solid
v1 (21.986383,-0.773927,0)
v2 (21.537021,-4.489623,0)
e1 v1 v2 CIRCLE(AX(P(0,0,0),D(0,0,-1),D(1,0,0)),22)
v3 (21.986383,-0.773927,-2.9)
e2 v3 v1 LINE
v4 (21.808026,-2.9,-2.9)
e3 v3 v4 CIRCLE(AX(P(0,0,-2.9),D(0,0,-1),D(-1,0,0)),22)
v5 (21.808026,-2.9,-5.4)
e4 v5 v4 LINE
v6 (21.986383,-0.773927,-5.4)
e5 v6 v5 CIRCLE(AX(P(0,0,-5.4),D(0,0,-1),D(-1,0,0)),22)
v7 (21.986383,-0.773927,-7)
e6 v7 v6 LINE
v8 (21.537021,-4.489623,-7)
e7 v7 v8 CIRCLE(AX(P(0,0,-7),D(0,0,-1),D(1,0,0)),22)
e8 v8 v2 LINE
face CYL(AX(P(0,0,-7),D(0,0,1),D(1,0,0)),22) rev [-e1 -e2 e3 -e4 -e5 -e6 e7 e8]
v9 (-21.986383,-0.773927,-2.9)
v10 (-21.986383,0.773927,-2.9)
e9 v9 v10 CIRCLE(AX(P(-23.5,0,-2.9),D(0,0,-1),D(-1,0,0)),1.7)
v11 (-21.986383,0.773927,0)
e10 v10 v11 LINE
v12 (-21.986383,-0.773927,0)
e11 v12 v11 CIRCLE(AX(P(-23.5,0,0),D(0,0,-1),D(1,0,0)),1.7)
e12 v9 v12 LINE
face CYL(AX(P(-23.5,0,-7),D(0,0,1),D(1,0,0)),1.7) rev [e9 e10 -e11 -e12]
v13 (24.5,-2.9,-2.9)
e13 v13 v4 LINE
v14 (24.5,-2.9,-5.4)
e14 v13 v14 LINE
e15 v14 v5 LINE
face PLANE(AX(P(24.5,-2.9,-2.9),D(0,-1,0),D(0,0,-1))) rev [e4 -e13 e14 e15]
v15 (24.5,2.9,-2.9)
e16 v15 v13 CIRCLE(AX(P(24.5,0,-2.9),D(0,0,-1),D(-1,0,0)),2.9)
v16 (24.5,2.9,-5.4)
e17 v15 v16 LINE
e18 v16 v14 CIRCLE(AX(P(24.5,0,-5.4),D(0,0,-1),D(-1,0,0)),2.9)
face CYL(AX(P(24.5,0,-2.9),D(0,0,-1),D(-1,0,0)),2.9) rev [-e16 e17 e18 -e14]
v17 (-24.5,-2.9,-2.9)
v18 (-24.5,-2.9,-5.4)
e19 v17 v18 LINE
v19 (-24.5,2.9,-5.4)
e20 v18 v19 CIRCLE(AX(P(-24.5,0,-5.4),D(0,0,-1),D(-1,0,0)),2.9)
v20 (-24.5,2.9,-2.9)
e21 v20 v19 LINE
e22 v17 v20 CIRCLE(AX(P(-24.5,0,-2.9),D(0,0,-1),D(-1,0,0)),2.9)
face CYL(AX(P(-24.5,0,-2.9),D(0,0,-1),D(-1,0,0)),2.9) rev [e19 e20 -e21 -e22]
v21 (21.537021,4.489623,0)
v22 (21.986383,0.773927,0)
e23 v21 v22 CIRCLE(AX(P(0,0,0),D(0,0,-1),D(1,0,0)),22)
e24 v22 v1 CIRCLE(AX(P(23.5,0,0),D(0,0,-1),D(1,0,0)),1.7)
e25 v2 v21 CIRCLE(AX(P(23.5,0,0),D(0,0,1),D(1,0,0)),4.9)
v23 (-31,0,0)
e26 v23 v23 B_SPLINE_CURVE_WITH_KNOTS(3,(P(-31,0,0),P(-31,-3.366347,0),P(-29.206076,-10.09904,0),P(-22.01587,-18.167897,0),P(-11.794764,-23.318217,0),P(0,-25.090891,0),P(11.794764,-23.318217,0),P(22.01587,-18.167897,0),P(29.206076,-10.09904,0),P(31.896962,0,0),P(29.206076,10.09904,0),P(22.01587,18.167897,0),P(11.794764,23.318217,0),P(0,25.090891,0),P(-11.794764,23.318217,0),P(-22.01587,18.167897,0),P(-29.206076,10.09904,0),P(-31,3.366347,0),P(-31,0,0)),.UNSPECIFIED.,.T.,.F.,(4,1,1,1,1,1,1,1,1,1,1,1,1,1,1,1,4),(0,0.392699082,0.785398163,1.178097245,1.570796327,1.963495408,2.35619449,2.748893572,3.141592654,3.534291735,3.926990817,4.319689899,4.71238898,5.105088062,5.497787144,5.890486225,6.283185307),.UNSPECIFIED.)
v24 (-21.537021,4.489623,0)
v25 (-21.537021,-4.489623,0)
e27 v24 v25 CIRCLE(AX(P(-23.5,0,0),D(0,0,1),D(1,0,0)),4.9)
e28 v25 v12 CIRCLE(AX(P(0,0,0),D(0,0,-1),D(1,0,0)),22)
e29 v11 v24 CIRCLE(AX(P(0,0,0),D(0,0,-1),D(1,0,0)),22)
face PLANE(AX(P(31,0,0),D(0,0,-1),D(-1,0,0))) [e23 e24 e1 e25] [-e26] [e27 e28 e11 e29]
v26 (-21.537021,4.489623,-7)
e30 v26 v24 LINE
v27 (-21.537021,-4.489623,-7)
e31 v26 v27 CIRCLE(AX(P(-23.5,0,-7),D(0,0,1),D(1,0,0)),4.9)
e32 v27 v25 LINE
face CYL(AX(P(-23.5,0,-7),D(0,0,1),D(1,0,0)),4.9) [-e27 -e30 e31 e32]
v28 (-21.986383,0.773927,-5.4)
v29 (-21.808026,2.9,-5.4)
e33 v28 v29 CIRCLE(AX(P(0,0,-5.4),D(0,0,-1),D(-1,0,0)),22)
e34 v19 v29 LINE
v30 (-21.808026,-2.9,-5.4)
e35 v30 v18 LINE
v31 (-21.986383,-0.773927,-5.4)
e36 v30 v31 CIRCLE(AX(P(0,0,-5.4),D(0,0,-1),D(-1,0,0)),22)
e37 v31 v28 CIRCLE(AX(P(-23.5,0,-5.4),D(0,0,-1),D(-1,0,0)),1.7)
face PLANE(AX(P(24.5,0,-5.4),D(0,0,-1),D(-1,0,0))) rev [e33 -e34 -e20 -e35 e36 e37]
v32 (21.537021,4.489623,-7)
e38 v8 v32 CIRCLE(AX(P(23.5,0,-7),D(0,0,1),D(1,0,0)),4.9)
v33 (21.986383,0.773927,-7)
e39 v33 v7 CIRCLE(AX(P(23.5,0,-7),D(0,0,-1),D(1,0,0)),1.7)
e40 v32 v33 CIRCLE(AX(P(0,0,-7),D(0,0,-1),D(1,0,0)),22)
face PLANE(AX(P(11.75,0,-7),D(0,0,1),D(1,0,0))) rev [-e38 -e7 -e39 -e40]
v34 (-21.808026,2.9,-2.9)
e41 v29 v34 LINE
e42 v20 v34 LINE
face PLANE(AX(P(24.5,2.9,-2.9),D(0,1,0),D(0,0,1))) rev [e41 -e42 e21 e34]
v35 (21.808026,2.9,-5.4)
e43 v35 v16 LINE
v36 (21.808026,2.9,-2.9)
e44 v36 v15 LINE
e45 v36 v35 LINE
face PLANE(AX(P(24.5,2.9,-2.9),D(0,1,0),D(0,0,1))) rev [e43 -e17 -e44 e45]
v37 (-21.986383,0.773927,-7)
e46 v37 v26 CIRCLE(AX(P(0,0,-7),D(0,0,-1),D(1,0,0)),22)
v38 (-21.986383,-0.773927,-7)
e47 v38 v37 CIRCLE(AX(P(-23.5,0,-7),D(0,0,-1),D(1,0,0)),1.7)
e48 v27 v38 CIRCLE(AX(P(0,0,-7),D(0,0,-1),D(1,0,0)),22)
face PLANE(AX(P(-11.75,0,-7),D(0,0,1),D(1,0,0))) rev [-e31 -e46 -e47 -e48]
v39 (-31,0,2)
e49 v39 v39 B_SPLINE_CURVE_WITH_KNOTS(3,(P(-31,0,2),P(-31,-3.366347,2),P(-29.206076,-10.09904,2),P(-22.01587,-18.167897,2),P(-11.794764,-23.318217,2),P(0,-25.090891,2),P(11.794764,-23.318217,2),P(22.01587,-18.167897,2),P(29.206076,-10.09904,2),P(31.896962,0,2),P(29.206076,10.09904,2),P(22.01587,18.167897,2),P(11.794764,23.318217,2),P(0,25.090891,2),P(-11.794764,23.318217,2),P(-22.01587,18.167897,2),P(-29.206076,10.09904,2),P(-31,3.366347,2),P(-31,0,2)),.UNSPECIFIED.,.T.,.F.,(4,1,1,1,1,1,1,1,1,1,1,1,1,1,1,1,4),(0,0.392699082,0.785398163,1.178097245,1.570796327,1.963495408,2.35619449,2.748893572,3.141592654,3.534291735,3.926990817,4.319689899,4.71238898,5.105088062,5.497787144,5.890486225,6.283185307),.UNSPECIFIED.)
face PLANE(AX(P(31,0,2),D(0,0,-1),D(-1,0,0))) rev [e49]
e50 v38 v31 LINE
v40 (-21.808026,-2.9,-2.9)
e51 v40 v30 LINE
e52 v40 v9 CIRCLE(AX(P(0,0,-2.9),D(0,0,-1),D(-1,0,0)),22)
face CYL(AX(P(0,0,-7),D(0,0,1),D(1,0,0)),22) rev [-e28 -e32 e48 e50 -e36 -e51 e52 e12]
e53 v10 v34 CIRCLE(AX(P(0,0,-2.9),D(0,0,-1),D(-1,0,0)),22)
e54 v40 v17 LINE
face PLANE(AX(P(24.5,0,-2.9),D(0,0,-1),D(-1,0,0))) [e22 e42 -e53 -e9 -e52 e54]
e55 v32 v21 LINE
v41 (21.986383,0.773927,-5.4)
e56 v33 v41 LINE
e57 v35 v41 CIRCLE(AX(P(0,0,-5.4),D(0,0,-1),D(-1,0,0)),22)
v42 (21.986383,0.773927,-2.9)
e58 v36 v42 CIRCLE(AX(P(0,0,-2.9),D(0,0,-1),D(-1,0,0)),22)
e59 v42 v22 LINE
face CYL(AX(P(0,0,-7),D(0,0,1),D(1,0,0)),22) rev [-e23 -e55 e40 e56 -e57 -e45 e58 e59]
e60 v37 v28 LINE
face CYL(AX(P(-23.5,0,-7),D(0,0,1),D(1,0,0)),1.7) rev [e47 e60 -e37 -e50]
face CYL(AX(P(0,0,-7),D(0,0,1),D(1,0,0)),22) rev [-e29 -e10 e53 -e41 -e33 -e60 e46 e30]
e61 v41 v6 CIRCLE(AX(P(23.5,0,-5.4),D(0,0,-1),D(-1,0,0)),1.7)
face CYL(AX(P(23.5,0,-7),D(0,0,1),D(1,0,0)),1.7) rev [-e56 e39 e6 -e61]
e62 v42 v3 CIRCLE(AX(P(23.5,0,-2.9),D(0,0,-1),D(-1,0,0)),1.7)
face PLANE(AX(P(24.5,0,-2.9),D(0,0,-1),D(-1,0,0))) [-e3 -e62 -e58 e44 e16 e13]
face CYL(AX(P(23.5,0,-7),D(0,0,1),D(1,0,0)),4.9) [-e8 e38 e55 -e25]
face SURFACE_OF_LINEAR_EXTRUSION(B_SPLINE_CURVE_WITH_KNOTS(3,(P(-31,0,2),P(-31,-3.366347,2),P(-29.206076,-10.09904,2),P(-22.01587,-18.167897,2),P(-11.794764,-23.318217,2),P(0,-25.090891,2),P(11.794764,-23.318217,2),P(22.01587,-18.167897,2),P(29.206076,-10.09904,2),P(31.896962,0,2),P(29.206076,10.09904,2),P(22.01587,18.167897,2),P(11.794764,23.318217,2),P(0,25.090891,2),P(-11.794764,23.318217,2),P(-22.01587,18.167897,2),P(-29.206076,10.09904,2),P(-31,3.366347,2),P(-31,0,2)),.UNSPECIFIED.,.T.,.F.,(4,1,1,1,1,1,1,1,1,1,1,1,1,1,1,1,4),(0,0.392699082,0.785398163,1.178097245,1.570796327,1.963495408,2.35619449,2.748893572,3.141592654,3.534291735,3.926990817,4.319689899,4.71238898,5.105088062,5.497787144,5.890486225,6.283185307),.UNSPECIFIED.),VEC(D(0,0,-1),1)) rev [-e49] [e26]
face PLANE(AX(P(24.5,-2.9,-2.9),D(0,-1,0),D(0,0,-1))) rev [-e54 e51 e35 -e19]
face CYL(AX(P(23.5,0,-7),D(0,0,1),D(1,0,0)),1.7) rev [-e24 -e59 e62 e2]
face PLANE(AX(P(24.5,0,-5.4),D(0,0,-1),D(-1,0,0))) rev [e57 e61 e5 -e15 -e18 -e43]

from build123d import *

# Parameters (mm, degrees)
BOSS_EXTRUDE1_DEPTH = 2
BOSS_EXTRUDE2_DEPTH = 7
CUT_EXTRUDE3_DEPTH  = 2.5


# Read off the part's stored shape, not the designer's step: Boss-Extrude1
with BuildPart() as part:
    # Boss-Extrude1 outline → Boss-Extrude1 (new body)
    with BuildSketch(Plane.XY):
        with BuildLine():
            add(Edge.make_bspline(
                [(-31, 0), (-31, -3.366346592), (-29.206076059, -10.099039775), (-22.015870133, -18.167897158), (-11.794763727, -23.318217271), (0, -25.090891365), (11.794763727, -23.318217271), (22.015870133, -18.167897158), (29.206076059, -10.099039775), (31.896961971, 0), (29.206076059, 10.099039775), (22.015870133, 18.167897158), (11.794763727, 23.318217271), (0, 25.090891365), (-11.794763727, 23.318217271), (-22.015870133, 18.167897158), (-29.206076059, 10.099039775), (-31, 3.366346592), (-31, 0)],
                knots=[0, 0, 0, 0, 0.392699082, 0.785398163, 1.178097245, 1.570796327, 1.963495408, 2.35619449, 2.748893572, 3.141592654, 3.534291735, 3.926990817, 4.319689899, 4.71238898, 5.105088062, 5.497787144, 5.890486225, 6.283185307, 6.283185307, 6.283185307, 6.283185307], degree=3))
        make_face()
    extrude(amount=BOSS_EXTRUDE1_DEPTH)

    # Sketch3 → Boss-Extrude2 (add)
    with BuildSketch(Plane.XY):
        with BuildLine():
            ThreePointArc((-21.537021277, 4.489622983), (-28.4, 0), (-21.537021277, -4.489622983))
            ThreePointArc((-21.537021277, -4.489622983), (-21.840862575, -2.641348512), (-21.986382979, -0.773927331))
            ThreePointArc((-21.986382979, -0.773927331), (-25.2, 0), (-21.986382979, 0.773927331))
            ThreePointArc((-21.986382979, 0.773927331), (-21.840862575, 2.641348512), (-21.537021277, 4.489622983))
        make_face()
        with BuildLine():
            ThreePointArc((21.537021277, -4.489622983), (28.4, 0), (21.537021277, 4.489622983))
            ThreePointArc((21.537021277, 4.489622983), (21.840862575, 2.641348512), (21.986382979, 0.773927331))
            ThreePointArc((21.986382979, 0.773927331), (25.2, 0), (21.986382979, -0.773927331))
            ThreePointArc((21.986382979, -0.773927331), (21.840862575, -2.641348512), (21.537021277, -4.489622983))
        make_face()
    extrude(amount=-BOSS_EXTRUDE2_DEPTH)

    # Sketch4 → Cut-Extrude3 (cut)
    with BuildSketch(Plane(origin=(0, 0, -5.4), x_dir=(-1, 0, 0), z_dir=(0, 0, -1))):
        with BuildLine():
            Line((-24.5, 2.9), (24.5, 2.9))
            ThreePointArc((24.5, 2.9), (27.4, 0), (24.5, -2.9))
            Line((24.5, -2.9), (-24.5, -2.9))
            ThreePointArc((-24.5, -2.9), (-27.4, 0), (-24.5, 2.9))
        make_face()
    extrude(amount=-CUT_EXTRUDE3_DEPTH, mode=Mode.SUBTRACT)


solid = part.part
